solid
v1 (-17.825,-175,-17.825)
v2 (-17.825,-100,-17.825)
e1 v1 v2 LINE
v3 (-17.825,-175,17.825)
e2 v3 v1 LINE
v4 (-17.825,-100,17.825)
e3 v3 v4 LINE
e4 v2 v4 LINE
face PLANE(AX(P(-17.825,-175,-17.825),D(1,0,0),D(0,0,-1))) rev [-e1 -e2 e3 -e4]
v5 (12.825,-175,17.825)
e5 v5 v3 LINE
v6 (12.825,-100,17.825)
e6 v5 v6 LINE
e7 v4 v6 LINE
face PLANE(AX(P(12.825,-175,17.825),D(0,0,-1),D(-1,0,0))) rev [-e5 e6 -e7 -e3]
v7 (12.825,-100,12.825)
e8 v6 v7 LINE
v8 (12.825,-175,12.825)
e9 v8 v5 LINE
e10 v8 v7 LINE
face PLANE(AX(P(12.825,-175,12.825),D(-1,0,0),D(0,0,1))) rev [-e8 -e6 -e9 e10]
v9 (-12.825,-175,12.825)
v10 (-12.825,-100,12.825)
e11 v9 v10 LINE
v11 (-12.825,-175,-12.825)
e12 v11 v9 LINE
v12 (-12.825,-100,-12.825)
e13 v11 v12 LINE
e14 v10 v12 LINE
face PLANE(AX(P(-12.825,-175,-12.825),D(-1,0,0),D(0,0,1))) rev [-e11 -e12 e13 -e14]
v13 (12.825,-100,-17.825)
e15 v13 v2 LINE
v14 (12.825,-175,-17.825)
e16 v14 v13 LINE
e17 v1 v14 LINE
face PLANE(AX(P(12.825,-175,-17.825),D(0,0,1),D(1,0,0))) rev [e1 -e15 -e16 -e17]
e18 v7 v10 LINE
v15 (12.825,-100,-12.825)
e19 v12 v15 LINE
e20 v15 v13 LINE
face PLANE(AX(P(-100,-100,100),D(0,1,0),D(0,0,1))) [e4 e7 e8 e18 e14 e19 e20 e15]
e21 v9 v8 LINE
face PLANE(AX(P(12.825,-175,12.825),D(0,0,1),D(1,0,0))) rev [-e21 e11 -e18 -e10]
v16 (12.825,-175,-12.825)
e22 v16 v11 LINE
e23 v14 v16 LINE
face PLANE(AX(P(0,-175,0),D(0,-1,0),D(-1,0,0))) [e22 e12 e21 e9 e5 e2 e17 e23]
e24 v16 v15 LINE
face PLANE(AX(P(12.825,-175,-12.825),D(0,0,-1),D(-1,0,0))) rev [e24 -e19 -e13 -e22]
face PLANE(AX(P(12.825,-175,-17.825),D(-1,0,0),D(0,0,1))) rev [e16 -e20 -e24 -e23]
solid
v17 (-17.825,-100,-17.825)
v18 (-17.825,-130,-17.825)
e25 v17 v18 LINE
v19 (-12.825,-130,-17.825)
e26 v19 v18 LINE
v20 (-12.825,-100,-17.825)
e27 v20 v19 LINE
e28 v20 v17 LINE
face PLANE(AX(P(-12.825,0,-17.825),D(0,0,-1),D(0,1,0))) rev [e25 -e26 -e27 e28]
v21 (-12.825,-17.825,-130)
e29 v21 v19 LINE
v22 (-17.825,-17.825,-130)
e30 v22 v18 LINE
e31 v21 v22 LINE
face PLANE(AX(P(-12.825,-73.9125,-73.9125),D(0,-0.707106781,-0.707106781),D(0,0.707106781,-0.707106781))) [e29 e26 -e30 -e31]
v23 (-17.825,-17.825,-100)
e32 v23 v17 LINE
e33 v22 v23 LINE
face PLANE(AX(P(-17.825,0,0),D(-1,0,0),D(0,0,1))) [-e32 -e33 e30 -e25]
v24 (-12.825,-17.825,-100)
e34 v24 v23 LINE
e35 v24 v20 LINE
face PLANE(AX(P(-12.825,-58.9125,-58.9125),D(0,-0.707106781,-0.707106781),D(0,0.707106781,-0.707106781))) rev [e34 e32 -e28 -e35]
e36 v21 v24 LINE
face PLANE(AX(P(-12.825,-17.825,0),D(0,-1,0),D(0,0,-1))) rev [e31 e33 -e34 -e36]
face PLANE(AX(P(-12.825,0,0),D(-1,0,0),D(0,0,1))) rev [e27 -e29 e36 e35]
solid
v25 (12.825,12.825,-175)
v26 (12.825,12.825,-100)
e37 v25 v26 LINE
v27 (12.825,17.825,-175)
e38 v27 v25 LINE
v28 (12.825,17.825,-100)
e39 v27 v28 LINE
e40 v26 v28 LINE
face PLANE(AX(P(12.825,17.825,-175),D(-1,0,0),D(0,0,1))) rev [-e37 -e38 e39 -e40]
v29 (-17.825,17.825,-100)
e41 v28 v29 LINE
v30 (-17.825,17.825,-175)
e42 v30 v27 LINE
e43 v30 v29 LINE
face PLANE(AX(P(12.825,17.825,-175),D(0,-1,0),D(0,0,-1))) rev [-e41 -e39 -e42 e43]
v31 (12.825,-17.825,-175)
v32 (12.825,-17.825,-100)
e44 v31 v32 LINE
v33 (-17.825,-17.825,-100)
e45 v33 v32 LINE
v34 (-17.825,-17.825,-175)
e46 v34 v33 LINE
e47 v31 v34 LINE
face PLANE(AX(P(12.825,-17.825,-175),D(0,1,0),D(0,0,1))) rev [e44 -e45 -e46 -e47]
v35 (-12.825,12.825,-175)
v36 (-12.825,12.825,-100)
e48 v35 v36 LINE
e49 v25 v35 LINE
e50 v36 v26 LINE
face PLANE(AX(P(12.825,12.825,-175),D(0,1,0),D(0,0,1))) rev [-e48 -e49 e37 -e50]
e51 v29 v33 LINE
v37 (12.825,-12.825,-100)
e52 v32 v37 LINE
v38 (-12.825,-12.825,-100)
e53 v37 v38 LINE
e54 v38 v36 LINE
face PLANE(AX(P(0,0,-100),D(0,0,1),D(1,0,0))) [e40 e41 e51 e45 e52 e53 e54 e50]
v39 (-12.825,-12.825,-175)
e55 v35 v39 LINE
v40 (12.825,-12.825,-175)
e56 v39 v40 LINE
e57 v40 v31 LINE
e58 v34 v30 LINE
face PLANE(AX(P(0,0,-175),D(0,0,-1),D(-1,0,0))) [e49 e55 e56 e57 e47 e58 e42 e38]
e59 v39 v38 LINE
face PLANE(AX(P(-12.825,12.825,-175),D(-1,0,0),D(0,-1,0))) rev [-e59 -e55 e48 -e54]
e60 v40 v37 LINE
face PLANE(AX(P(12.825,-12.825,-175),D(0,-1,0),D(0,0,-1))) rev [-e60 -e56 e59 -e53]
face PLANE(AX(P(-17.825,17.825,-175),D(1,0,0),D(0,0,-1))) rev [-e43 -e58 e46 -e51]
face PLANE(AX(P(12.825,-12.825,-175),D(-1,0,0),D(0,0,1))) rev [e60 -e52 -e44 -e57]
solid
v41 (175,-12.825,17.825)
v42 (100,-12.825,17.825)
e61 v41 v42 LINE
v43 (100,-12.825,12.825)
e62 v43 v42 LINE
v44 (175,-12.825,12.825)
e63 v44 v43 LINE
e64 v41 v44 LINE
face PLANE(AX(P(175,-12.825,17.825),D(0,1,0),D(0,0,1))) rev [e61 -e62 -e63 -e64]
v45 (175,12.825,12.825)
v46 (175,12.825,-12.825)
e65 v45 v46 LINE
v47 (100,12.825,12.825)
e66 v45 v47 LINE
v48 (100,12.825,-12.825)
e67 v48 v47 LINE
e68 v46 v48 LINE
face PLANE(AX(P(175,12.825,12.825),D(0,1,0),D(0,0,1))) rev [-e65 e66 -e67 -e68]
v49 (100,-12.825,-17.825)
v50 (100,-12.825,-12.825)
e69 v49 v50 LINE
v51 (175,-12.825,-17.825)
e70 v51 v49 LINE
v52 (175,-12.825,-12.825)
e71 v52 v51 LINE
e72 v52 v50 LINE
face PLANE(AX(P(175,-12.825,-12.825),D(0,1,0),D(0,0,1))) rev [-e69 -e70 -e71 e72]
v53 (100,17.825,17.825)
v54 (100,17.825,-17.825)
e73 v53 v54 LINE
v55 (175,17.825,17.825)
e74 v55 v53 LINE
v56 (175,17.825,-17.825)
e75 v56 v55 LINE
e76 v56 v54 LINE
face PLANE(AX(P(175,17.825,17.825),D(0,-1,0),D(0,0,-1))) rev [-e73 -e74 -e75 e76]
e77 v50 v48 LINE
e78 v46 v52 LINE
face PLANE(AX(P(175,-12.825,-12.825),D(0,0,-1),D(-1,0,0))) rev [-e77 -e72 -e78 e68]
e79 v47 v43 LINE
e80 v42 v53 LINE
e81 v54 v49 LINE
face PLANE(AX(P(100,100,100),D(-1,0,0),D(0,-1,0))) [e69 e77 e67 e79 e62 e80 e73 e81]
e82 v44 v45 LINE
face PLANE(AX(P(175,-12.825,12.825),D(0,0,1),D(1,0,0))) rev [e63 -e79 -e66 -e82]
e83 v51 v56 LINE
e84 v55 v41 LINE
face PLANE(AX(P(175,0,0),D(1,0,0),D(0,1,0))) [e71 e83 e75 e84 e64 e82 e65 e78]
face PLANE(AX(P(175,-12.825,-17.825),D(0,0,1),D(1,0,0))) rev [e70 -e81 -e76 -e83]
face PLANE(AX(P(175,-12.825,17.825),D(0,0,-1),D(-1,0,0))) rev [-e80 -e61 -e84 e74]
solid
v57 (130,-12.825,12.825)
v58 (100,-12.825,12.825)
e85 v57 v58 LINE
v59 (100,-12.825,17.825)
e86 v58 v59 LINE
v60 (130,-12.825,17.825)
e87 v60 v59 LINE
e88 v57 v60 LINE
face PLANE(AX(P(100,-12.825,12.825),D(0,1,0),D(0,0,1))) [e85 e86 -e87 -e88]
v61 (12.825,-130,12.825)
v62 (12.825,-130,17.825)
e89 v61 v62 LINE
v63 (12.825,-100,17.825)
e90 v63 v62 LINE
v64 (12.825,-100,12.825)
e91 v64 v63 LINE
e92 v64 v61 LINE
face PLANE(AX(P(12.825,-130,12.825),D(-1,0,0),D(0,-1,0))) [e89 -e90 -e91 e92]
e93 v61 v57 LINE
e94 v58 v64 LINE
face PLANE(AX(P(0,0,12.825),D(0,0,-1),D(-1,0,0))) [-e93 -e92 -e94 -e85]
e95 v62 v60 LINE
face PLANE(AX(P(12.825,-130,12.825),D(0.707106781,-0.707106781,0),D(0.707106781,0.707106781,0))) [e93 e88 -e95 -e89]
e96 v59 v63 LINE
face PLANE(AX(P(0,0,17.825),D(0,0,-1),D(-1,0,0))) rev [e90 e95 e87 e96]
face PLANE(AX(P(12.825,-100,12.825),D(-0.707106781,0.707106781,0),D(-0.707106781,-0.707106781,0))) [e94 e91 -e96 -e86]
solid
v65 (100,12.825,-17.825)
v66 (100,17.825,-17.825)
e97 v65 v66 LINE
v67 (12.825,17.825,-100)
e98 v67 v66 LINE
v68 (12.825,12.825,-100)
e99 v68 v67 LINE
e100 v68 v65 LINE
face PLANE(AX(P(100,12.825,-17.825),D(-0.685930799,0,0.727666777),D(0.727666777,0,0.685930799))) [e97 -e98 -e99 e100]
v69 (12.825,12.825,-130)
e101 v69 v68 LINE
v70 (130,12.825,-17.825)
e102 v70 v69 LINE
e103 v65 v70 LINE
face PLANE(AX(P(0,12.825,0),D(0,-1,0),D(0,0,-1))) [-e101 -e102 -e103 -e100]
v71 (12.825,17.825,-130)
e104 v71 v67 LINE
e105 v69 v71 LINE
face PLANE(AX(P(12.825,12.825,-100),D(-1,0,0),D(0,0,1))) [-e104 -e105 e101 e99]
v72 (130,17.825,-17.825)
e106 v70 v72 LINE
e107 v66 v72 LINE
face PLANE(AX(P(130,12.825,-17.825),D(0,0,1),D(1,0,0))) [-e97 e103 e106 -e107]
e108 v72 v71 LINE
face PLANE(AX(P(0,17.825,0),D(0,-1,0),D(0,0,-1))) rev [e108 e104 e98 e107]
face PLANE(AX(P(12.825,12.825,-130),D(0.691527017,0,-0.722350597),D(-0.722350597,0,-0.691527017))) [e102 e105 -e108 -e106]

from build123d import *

# Parameters (mm, degrees)
C_START                                 = -12.825
C_CHANNEL_IGVC_5MM_CORNER_3_OUTLINE_W   = 162.175
C_CHANNEL_IGVC_5MM_CORNER_3_OUTLINE_H   = 5
C_CHANNEL_IGVC_5MM_CORNER_3_DEPTH       = 30.65
C_START_2                               = 12.825
C_CHANNEL_IGVC_5MM_CORNER_3_2_DEPTH     = 5
C_START_3                               = -175
C_CHANNEL_IGVC_5MM_CORNER_3_3_DEPTH     = 157.175
C_START_4                               = -17.825
C_CHANNEL_IGVC_5MM_CORNER_3_4_OUTLINE_W = 5
C_CHANNEL_IGVC_5MM_CORNER_3_4_OUTLINE_H = 175
C_CHANNEL_IGVC_5MM_CORNER_3_4_DEPTH     = 30.65
C_CHANNEL_IGVC_5MM_CORNER_3_5_OUTLINE_W = 25.65
C_CHANNEL_IGVC_5MM_CORNER_3_5_OUTLINE_H = 175
C_CHANNEL_IGVC_5MM_CORNER_3_5_DEPTH     = 5
CUT_EXTRUDE1_DEPTH                      = 100
CUT_EXTRUDE1_DEPTH_BACK                 = 100
SKETCH16_W                              = 200
SKETCH16_H                              = 200
BOSS_EXTRUDE2_DEPTH                     = 5
BOSS_EXTRUDE3_DEPTH                     = 5
BOSS_EXTRUDE4_DEPTH                     = 5


# Read off the part's stored shape, not the designer's step: C channel IGVC_5MM_CORNER(3)
with BuildPart() as part:
    # C channel IGVC_5MM_CORNER(3) outline → C channel IGVC_5MM_CORNER(3) (new body)
    with BuildSketch(Plane(origin=(0, 0, 0), x_dir=(1, 0, 0), z_dir=(0, 1, 0)).offset(C_START)):
        with Locations((93.9125, 15.325)):
            Rectangle(C_CHANNEL_IGVC_5MM_CORNER_3_OUTLINE_W, C_CHANNEL_IGVC_5MM_CORNER_3_OUTLINE_H)
        with Locations((93.9125, -15.325)):
            Rectangle(C_CHANNEL_IGVC_5MM_CORNER_3_OUTLINE_W, C_CHANNEL_IGVC_5MM_CORNER_3_OUTLINE_H)
    extrude(amount=C_CHANNEL_IGVC_5MM_CORNER_3_DEPTH)

    # C channel IGVC_5MM_CORNER_3 2 outline → C channel IGVC_5MM_CORNER_3 2 (add)
    with BuildSketch(Plane(origin=(0, 0, 0), x_dir=(1, 0, 0), z_dir=(0, 1, 0)).offset(C_START_2)):
        Polygon((175, -12.825), (175, 12.825), (12.825, 12.825), (12.825, 0), (-12.825, 0), (-12.825, -12.825), align=None)
    extrude(amount=C_CHANNEL_IGVC_5MM_CORNER_3_2_DEPTH)


with BuildPart() as body_2:
    # C channel IGVC_5MM_CORNER_3 3 outline → C channel IGVC_5MM_CORNER_3 3 (new body)
    with BuildSketch(Plane(origin=(0, 0, 0), x_dir=(1, 0, 0), z_dir=(0, 1, 0)).offset(C_START_3)):
        Polygon((12.825, 12.825), (12.825, 17.825), (-17.825, 17.825), (-17.825, -17.825), (12.825, -17.825), (12.825, -12.825), (-12.825, -12.825), (-12.825, 12.825), align=None)
    extrude(amount=C_CHANNEL_IGVC_5MM_CORNER_3_3_DEPTH)


with BuildPart() as body_3:
    # C channel IGVC_5MM_CORNER_3 4 outline → C channel IGVC_5MM_CORNER_3 4 (new body)
    with BuildSketch(Plane.YZ.offset(C_START_4)):
        with Locations((-15.325, -87.5)):
            Rectangle(C_CHANNEL_IGVC_5MM_CORNER_3_4_OUTLINE_W, C_CHANNEL_IGVC_5MM_CORNER_3_4_OUTLINE_H)
        with Locations((15.325, -87.5)):
            Rectangle(C_CHANNEL_IGVC_5MM_CORNER_3_4_OUTLINE_W, C_CHANNEL_IGVC_5MM_CORNER_3_4_OUTLINE_H)
    extrude(amount=C_CHANNEL_IGVC_5MM_CORNER_3_4_DEPTH)

    # C channel IGVC_5MM_CORNER_3 5 outline → C channel IGVC_5MM_CORNER_3 5 (add)
    with BuildSketch(Plane.YZ.offset(C_START_4)):
        with Locations((0, -87.5)):
            Rectangle(C_CHANNEL_IGVC_5MM_CORNER_3_5_OUTLINE_W, C_CHANNEL_IGVC_5MM_CORNER_3_5_OUTLINE_H)
    extrude(amount=C_CHANNEL_IGVC_5MM_CORNER_3_5_DEPTH)


with BuildPart() as cut_extrude1_tool:
    # Sketch16 → Cut-Extrude1 (new, two sides: drawn at the far end of the back side and taken through both)
    with BuildSketch(Plane.XY.offset(-CUT_EXTRUDE1_DEPTH_BACK)):
        Rectangle(SKETCH16_W, SKETCH16_H)
    extrude(amount=CUT_EXTRUDE1_DEPTH + CUT_EXTRUDE1_DEPTH_BACK)


with BuildPart() as part_1:
    add(part.part)

    # Cut-Extrude1: cut by cut_extrude1_tool
    add(cut_extrude1_tool.part, mode=Mode.SUBTRACT)


with BuildPart() as body_2_1:
    add(body_2.part)

    # Cut-Extrude1: cut by cut_extrude1_tool
    add(cut_extrude1_tool.part, mode=Mode.SUBTRACT)


with BuildPart() as body_3_1:
    add(body_3.part)

    # Cut-Extrude1: cut by cut_extrude1_tool
    add(cut_extrude1_tool.part, mode=Mode.SUBTRACT)


with BuildPart() as body_4:
    # Sketch17 → Boss-Extrude2 (new body)
    with BuildSketch(Plane.ZY.offset(17.825)):
        Polygon((-17.825, -100), (-100, -17.825), (-130, -17.825), (-17.825, -130), align=None)
    extrude(amount=-BOSS_EXTRUDE2_DEPTH)


with BuildPart() as body_5:
    # Sketch20 → Boss-Extrude3 (new body)
    with BuildSketch(Plane.XY.offset(17.825)):
        Polygon((12.825, -130), (130, -12.825), (100, -12.825), (12.825, -100), align=None)
    extrude(amount=-BOSS_EXTRUDE3_DEPTH)


with BuildPart() as body_6:
    # Sketch21 → Boss-Extrude4 (new body)
    with BuildSketch(Plane(origin=(0, 17.825, 0), x_dir=(1, 0, 0), z_dir=(0, 1, 0))):
        Polygon((100, 17.825), (12.825, 100), (12.825, 130), (130, 17.825), align=None)
    extrude(amount=-BOSS_EXTRUDE4_DEPTH)


solid = Compound([part_1.part, body_2_1.part, body_3_1.part, body_4.part, body_5.part, body_6.part])
